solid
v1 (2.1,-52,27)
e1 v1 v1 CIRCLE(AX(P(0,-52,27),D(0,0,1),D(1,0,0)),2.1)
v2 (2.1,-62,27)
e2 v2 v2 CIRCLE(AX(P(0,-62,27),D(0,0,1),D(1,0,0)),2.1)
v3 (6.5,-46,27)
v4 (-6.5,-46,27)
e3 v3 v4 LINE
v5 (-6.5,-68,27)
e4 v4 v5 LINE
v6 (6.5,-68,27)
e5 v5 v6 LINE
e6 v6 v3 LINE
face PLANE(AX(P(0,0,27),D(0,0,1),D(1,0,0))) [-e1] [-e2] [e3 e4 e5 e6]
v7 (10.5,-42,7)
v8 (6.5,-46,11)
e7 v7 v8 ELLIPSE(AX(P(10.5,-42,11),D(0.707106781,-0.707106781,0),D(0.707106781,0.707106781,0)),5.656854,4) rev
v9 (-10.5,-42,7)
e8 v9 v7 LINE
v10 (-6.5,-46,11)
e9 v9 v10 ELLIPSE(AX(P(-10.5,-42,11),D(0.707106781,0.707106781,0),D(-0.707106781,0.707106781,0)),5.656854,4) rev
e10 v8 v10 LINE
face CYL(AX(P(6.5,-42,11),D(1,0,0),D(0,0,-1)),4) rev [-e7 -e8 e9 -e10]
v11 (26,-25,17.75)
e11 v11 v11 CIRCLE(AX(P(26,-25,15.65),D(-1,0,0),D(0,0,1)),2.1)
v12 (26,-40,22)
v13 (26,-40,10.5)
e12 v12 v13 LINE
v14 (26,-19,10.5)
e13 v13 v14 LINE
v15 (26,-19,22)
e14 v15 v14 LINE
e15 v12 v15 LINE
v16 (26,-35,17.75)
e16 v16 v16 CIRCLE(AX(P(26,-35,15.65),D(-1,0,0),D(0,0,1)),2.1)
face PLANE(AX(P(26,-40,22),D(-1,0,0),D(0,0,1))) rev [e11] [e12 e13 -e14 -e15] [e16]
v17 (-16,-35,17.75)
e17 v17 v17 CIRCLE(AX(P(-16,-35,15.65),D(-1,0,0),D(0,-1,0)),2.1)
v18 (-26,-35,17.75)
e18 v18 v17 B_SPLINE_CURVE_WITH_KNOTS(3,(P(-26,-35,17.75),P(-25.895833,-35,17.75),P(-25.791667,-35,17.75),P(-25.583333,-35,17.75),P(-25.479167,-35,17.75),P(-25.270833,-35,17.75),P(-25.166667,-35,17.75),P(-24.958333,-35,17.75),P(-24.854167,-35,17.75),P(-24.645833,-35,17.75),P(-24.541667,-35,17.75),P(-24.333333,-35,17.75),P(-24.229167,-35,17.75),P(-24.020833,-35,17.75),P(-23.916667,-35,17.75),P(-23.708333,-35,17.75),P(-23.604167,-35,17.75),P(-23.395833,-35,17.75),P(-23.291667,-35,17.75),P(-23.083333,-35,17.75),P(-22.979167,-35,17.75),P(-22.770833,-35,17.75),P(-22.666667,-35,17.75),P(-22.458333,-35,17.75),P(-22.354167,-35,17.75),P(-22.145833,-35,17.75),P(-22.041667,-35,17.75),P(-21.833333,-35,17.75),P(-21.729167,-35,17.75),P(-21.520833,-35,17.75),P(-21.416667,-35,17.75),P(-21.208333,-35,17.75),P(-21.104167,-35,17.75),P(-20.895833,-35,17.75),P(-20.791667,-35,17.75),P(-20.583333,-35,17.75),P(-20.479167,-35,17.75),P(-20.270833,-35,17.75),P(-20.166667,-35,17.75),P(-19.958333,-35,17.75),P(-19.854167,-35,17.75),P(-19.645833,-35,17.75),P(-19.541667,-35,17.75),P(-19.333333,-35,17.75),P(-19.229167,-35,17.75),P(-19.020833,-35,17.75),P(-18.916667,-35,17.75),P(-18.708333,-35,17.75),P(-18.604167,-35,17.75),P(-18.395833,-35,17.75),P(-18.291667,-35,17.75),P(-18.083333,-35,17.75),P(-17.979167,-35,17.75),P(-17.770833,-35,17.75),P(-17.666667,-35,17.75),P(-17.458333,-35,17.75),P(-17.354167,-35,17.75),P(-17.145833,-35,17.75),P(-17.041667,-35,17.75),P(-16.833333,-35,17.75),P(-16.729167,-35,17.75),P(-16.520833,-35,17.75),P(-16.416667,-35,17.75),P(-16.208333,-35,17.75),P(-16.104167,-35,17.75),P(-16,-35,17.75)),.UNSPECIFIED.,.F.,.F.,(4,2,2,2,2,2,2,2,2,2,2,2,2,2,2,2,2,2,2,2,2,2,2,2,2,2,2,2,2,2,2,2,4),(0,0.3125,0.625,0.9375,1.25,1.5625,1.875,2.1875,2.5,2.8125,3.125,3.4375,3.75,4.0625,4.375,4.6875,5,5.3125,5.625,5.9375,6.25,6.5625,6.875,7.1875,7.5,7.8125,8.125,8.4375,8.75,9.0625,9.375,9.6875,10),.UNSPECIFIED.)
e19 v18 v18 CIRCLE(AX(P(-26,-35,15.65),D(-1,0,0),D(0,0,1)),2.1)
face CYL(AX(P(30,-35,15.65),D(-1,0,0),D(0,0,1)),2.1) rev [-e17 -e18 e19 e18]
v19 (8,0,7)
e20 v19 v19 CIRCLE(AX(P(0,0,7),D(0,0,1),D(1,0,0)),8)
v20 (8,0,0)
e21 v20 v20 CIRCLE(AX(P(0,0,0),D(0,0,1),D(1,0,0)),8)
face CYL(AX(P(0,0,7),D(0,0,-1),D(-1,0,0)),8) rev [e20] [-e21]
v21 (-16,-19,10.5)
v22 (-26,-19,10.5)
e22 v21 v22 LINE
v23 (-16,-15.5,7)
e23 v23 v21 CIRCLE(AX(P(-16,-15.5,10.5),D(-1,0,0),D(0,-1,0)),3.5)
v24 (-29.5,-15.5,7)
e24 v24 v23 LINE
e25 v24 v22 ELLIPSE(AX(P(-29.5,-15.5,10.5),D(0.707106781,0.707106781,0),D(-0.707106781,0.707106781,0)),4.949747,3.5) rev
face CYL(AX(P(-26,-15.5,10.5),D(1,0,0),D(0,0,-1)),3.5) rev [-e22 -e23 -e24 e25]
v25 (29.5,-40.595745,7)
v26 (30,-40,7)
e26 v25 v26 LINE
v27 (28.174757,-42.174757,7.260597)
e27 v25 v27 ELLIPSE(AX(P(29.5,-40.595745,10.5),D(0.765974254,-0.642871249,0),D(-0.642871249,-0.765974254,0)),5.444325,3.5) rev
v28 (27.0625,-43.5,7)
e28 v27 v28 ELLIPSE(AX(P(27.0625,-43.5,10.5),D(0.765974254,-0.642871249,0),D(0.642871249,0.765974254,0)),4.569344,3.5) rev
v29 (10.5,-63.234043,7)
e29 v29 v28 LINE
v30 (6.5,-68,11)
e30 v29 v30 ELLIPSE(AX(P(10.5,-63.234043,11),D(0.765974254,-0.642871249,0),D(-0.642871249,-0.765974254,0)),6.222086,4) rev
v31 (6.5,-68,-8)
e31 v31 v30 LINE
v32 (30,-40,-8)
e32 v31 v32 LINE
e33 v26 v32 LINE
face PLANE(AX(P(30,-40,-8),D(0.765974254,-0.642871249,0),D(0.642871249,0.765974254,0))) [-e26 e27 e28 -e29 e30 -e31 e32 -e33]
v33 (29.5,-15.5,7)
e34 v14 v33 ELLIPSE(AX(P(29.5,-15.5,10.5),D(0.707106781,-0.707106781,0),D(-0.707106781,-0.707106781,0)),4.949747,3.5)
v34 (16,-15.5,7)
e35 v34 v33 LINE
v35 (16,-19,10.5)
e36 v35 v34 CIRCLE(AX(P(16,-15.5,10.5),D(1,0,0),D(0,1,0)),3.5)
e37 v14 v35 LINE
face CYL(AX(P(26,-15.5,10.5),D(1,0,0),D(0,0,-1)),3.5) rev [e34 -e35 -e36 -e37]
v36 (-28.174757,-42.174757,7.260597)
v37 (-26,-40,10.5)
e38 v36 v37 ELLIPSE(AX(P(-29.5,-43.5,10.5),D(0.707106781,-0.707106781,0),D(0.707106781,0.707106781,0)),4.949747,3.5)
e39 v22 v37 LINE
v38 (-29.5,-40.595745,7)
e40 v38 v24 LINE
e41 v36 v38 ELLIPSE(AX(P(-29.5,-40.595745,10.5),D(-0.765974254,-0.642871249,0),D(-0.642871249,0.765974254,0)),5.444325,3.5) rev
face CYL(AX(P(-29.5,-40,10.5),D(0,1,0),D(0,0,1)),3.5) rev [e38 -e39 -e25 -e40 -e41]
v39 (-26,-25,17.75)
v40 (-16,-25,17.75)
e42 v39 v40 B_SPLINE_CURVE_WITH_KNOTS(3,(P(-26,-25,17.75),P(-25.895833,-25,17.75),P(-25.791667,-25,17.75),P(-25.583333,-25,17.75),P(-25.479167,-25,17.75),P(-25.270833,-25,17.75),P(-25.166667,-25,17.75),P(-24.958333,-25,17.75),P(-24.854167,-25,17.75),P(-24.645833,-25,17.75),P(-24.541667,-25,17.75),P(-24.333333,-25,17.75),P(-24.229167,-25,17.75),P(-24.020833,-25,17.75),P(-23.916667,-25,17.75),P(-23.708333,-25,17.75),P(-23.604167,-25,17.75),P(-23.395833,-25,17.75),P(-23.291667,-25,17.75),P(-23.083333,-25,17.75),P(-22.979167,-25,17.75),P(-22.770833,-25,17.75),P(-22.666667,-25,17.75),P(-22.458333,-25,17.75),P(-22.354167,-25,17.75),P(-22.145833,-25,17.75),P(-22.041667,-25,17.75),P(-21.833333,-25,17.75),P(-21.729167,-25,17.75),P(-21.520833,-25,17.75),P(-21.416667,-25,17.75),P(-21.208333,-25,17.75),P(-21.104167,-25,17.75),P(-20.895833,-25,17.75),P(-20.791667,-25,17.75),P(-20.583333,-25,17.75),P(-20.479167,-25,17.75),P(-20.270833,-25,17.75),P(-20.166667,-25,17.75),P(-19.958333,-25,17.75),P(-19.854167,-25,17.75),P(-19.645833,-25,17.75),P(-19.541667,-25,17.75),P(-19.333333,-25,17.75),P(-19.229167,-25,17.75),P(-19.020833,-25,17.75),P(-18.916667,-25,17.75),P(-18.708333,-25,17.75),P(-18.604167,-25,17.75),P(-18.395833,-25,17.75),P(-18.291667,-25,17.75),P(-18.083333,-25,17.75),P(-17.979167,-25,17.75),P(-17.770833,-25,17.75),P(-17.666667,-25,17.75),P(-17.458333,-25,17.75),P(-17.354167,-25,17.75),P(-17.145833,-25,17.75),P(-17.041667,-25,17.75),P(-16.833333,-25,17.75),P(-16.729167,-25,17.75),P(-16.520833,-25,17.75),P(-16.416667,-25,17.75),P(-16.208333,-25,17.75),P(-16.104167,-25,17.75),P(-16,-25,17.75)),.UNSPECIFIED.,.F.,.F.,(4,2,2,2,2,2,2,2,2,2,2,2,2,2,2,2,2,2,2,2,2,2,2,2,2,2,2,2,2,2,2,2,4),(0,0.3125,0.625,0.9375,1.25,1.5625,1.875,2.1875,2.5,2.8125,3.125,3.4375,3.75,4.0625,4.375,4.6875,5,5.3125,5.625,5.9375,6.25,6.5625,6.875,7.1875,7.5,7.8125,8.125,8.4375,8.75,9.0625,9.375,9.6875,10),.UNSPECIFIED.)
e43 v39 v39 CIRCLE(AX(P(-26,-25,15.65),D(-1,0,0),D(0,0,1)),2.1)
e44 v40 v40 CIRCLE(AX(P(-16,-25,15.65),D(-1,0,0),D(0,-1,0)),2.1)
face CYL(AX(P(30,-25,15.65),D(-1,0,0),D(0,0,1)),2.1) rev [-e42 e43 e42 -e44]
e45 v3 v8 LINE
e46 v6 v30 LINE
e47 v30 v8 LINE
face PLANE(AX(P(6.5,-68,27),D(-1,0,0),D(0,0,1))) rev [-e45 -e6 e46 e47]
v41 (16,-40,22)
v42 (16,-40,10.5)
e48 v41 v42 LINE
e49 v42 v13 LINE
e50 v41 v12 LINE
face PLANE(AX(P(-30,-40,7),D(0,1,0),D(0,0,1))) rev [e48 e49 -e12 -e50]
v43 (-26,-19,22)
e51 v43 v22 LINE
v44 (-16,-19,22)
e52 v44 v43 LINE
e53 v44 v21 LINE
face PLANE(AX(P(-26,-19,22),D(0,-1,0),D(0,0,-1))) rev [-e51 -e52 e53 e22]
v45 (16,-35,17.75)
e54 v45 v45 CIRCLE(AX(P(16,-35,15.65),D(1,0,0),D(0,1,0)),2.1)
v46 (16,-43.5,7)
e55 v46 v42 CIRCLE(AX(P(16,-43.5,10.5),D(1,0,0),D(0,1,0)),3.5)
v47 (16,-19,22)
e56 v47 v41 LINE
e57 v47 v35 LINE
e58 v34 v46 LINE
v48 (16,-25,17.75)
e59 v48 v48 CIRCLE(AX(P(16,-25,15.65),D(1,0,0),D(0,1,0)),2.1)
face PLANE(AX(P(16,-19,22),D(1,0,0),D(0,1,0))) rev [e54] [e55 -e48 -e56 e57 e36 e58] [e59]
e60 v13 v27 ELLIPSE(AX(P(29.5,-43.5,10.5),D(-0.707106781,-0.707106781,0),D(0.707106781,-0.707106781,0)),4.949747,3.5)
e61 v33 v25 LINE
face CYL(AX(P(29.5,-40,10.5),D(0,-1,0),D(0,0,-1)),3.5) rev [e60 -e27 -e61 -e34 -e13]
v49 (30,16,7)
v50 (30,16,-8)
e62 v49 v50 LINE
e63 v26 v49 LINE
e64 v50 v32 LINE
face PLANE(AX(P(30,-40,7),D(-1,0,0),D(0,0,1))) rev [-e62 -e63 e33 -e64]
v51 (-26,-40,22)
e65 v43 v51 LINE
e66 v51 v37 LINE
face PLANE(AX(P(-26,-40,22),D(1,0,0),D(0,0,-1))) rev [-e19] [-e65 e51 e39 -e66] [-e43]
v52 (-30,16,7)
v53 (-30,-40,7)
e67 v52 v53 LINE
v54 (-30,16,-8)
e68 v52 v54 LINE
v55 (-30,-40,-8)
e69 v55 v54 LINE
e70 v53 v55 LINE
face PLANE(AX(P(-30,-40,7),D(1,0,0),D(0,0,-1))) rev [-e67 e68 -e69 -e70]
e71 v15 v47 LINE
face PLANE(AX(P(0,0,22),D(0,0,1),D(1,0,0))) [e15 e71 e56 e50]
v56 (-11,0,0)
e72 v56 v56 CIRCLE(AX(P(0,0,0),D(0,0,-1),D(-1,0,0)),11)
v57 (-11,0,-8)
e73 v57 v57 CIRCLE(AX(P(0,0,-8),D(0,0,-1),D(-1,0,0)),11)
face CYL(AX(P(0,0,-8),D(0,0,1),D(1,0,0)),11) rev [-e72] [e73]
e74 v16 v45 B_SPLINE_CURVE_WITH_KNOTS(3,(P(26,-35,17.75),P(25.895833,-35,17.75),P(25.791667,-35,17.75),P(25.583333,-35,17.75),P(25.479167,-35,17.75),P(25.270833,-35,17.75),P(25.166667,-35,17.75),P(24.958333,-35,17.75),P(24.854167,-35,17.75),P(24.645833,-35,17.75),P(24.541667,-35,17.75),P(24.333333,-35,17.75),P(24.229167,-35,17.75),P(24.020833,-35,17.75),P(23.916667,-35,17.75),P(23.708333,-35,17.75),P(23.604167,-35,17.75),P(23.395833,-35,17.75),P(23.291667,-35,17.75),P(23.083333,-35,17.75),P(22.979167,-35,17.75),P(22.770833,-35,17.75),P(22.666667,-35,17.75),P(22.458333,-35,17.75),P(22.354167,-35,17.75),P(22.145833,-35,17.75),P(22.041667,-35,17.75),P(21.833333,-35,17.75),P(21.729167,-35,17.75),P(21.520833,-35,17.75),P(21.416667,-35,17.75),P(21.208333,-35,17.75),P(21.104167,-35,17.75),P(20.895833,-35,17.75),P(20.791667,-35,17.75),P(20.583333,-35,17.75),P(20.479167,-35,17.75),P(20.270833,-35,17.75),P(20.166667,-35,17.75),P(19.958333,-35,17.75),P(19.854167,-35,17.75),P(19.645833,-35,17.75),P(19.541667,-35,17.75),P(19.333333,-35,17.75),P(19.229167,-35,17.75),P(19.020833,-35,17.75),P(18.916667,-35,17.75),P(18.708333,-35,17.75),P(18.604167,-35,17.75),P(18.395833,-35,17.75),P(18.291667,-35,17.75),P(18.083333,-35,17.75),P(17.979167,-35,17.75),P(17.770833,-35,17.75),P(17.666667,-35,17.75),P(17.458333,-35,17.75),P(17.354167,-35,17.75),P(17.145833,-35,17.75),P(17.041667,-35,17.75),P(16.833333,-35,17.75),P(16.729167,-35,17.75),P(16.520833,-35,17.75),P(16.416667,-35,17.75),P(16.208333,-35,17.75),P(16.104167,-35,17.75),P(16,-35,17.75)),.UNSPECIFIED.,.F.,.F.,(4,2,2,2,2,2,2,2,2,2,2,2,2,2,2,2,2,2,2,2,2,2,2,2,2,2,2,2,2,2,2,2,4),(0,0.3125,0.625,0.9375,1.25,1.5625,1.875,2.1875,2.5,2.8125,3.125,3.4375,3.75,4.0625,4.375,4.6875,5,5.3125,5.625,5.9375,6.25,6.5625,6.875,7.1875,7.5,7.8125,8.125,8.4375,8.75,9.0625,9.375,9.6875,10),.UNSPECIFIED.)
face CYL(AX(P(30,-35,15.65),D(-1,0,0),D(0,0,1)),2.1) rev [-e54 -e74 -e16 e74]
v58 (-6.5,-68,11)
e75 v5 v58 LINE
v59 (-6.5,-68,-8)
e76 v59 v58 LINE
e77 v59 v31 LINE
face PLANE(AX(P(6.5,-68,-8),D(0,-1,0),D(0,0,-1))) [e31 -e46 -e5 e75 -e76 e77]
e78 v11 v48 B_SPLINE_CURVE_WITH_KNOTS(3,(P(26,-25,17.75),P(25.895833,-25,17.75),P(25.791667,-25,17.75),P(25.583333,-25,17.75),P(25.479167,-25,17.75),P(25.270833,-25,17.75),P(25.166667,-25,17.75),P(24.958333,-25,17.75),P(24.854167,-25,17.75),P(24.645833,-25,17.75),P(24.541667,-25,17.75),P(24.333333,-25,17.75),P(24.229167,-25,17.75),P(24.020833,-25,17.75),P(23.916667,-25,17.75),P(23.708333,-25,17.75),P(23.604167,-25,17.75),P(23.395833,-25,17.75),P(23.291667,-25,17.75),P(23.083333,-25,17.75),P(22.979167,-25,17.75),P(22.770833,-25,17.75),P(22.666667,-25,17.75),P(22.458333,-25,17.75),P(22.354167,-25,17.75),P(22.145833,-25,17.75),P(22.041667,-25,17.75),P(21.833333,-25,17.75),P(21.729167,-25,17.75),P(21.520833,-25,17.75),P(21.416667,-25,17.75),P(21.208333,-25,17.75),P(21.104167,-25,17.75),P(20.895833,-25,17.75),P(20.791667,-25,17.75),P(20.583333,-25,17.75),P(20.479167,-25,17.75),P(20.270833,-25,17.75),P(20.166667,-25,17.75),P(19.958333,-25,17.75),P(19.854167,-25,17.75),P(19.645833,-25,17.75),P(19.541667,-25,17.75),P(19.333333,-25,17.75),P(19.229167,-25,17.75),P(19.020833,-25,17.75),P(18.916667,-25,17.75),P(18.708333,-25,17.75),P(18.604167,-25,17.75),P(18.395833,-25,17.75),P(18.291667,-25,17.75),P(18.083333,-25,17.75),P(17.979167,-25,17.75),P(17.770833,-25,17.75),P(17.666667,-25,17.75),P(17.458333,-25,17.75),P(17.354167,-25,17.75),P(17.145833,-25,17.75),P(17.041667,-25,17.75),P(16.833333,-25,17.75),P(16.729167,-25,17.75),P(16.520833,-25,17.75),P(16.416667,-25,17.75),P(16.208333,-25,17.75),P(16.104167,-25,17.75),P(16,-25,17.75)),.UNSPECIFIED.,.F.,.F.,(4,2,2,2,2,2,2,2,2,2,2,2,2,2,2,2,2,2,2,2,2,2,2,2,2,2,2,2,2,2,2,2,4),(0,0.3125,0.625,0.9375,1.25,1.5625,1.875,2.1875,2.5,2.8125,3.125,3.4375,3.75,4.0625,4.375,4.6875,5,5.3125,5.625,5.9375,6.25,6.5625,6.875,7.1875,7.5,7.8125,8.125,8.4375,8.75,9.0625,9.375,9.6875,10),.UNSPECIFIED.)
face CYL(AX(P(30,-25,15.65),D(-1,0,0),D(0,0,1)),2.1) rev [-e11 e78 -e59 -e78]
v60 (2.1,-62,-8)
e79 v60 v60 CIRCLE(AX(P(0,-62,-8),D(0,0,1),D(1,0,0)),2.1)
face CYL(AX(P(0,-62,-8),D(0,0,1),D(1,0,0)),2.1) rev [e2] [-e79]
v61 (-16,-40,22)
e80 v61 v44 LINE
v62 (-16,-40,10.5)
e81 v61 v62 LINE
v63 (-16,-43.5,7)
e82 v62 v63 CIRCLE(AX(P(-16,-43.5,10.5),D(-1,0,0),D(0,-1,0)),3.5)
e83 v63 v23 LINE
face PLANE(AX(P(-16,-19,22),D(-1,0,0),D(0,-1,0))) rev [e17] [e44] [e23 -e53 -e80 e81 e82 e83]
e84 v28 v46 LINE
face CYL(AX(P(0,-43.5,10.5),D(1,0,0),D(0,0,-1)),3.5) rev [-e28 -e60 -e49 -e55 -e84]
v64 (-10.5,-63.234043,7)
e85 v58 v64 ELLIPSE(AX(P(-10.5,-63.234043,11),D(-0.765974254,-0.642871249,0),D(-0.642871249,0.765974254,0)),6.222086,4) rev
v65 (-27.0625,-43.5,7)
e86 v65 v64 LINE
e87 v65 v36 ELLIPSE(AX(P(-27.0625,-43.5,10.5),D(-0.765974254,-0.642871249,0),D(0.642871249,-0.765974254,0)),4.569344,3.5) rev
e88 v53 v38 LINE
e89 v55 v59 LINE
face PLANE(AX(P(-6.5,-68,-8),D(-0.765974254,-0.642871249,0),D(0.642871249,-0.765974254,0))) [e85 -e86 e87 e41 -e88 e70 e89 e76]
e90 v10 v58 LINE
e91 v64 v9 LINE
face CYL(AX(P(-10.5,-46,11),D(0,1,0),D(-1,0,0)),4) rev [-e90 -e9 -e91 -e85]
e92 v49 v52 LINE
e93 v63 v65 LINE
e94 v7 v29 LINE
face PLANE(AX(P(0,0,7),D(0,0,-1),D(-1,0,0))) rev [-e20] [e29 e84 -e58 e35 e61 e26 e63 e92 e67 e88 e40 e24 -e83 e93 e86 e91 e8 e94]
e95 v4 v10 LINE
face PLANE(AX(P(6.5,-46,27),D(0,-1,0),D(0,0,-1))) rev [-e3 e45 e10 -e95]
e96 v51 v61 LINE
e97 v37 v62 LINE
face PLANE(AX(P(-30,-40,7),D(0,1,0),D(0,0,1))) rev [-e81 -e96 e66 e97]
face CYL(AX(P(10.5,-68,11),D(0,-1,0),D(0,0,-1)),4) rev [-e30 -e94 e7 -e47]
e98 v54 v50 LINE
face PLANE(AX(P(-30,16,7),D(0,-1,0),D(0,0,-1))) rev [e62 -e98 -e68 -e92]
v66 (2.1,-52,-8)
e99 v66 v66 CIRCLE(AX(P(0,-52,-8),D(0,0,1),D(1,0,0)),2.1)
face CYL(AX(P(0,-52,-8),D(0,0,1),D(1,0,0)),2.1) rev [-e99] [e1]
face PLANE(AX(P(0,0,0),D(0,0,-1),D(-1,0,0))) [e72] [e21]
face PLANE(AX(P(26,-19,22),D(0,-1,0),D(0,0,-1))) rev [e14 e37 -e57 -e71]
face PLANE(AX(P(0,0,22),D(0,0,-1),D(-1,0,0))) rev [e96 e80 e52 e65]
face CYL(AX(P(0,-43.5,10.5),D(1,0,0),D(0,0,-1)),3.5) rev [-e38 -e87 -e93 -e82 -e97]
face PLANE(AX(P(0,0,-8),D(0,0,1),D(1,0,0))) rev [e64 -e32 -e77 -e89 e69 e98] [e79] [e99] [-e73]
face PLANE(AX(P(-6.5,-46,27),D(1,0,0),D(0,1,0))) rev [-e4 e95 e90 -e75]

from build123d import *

# Parameters (mm, degrees)
SKETCH1_W           = 60
SKETCH1_H           = 56
SKETCH1_R           = 8
BOSS_EXTRUDE1_DEPTH = 7
SKETCH2_W           = 60
SKETCH2_H           = 56
SKETCH2_R           = 11
BOSS_EXTRUDE2_DEPTH = 8
SKETCH3_W           = 10
SKETCH3_H           = 21
BOSS_EXTRUDE3_DEPTH = 15
SKETCH4_R           = 2.1
CUT_EXTRUDE1_DEPTH  = 73.249567473
SKETCH5_R           = 2.1
BOSS_EXTRUDE4_DEPTH = 15
FILLET2_R           = 3.5
BOSS_EXTRUDE5_START = 20
SKETCH7_W           = 13
SKETCH7_H           = 22
SKETCH7_R           = 2.1
BOSS_EXTRUDE5_DEPTH = 20
FILLET3_R           = 4


with BuildPart() as part:
    # Sketch1 → Boss-Extrude1 (new body)
    with BuildSketch(Plane.XY):
        with Locations((0, -12)):
            Rectangle(SKETCH1_W, SKETCH1_H)
        Circle(SKETCH1_R, mode=Mode.SUBTRACT)
    extrude(amount=BOSS_EXTRUDE1_DEPTH)

    # Sketch2 → Boss-Extrude2 (add)
    with BuildSketch(Plane(origin=(0, 0, 0), x_dir=(-1, 0, 0), z_dir=(0, 0, -1))):
        with Locations((0, -12)):
            Rectangle(SKETCH2_W, SKETCH2_H)
        Circle(SKETCH2_R, mode=Mode.SUBTRACT)
    extrude(amount=BOSS_EXTRUDE2_DEPTH)

    # Sketch3 → Boss-Extrude3 (add)
    with BuildSketch(Plane.XY.offset(7)):
        with Locations((-21, -29.5)):
            Rectangle(SKETCH3_W, SKETCH3_H)
        with Locations((21, -29.5)):
            Rectangle(SKETCH3_W, SKETCH3_H)
    extrude(amount=BOSS_EXTRUDE3_DEPTH)

    # Sketch4 → Cut-Extrude1 (cut, through all)
    with BuildSketch(Plane.ZY.offset(26)):
        with Locations((15.65, -25)):
            Circle(SKETCH4_R)
        with Locations((15.65, -35)):
            Circle(SKETCH4_R)
    extrude(amount=-CUT_EXTRUDE1_DEPTH, mode=Mode.SUBTRACT)

    # Sketch5 → Boss-Extrude4 (add, through all)
    with BuildSketch(Plane.XY.offset(7)):
        Polygon((-30, -40), (30, -40), (6.5, -68), (-6.5, -68), align=None)
        with Locations((0, -52)):
            Circle(SKETCH5_R, mode=Mode.SUBTRACT)
        with Locations((0, -62)):
            Circle(SKETCH5_R, mode=Mode.SUBTRACT)
    extrude(amount=-BOSS_EXTRUDE4_DEPTH)

    # Fillet2
    # the kernel refuses this fillet: 3.5 mm, written as the material it adds along each edge
    with BuildSketch(Plane(origin=(-26, -19, 7), x_dir=(0, 1, 0), z_dir=(1, 0, 0)), Plane(origin=(-26, -40, 7), x_dir=(0, 0, 1), z_dir=(1, 0, 0))) as fillet2_piece_1:
        with BuildLine():
            CenterArc((FILLET2_R, FILLET2_R), FILLET2_R, 180, 90)
            Line((0, FILLET2_R), (0, 0))
            Line((0, 0), (FILLET2_R, 0))
        make_face()
    extrude(amount=10)
    with BuildSketch(Plane(origin=(-26, -40, 7), x_dir=(-1, 0, 0), z_dir=(0, 1, 0))) as fillet2_piece_2:
        with BuildLine():
            CenterArc((FILLET2_R, FILLET2_R), FILLET2_R, 180, 90)
            Line((0, FILLET2_R), (0, 0))
            Line((0, 0), (FILLET2_R, 0))
        make_face()
    extrude(amount=21)
    with BuildSketch(Plane(origin=(26, -19, 7), x_dir=(0, 1, 0), z_dir=(-1, 0, 0)), Plane(origin=(16, -40, 7), x_dir=(0, -1, 0), z_dir=(1, 0, 0))) as fillet2_piece_3:
        with BuildLine():
            CenterArc((FILLET2_R, -FILLET2_R), FILLET2_R, 90, 90)
            Line((0, -FILLET2_R), (0, 0))
            Line((0, 0), (FILLET2_R, 0))
        make_face()
    extrude(amount=10)
    with BuildSketch(Plane(origin=(26, -40, 7), x_dir=(1, 0, 0), z_dir=(0, 1, 0))) as fillet2_piece_4:
        with BuildLine():
            CenterArc((FILLET2_R, -FILLET2_R), FILLET2_R, 90, 90)
            Line((0, -FILLET2_R), (0, 0))
            Line((0, 0), (FILLET2_R, 0))
        make_face()
    extrude(amount=21)
    with BuildSketch(Plane(origin=(-34.75, -19, 7), x_dir=(0, 1, 0), z_dir=(1, 0, 0))) as fillet2_piece_5a_section:
        with BuildLine():
            CenterArc((FILLET2_R, FILLET2_R), FILLET2_R, 180, 90)
            Line((0, FILLET2_R), (0, 0))
            Line((0, 0), (FILLET2_R, 0))
        make_face()
    fillet2_piece_5a = extrude(amount=18.75, mode=Mode.PRIVATE)
    fillet2_piece_5a = split(fillet2_piece_5a, bisect_by=Plane(origin=(-30, -18.2076171, 7.7923829), z_dir=(1, 0, 0)), keep=Keep.TOP, mode=Mode.PRIVATE)
    fillet2_piece_5a = split(fillet2_piece_5a, bisect_by=Plane(origin=(-26, -18.2076171, 7.7923829), z_dir=(-1, 0, 0)), keep=Keep.TOP, mode=Mode.PRIVATE)
    with BuildSketch(Plane(origin=(-26, -40, 7), x_dir=(-1, 0, 0), z_dir=(0, 1, 0))) as fillet2_piece_5b_section:
        with BuildLine():
            CenterArc((FILLET2_R, FILLET2_R), FILLET2_R, 180, 90)
            Line((0, FILLET2_R), (0, 0))
            Line((0, 0), (FILLET2_R, 0))
        make_face()
    fillet2_piece_5b = extrude(amount=29.75, mode=Mode.PRIVATE)
    fillet2_piece_5b = split(fillet2_piece_5b, bisect_by=Plane(origin=(-26.7923829, -19, 7.7923829), z_dir=(0, 1, 0)), keep=Keep.TOP, mode=Mode.PRIVATE)
    fillet2_piece_5 = fillet2_piece_5a & fillet2_piece_5b
    add(fillet2_piece_5)
    with BuildSketch(Plane(origin=(-34.75, -40, 7), x_dir=(0, 0, 1), z_dir=(1, 0, 0))) as fillet2_piece_6a_section:
        with BuildLine():
            CenterArc((FILLET2_R, FILLET2_R), FILLET2_R, 180, 90)
            Line((0, FILLET2_R), (0, 0))
            Line((0, 0), (FILLET2_R, 0))
        make_face()
    fillet2_piece_6a = extrude(amount=18.75, mode=Mode.PRIVATE)
    fillet2_piece_6a = split(fillet2_piece_6a, bisect_by=Plane(origin=(-26, -40.649592252, 7.87643738), z_dir=(-1, 0, 0)), keep=Keep.TOP, mode=Mode.PRIVATE)
    fillet2_piece_6a = split(fillet2_piece_6a, bisect_by=Plane(origin=(-28.740316489, -41.500899502, 7.87643738), z_dir=(0.765974253829985, 0.6428712487501661, 0)), keep=Keep.TOP, mode=Mode.PRIVATE)
    fillet2_piece_6a = split(fillet2_piece_6a, bisect_by=Plane(origin=(-30, -40.649592252, 7.87643738), z_dir=(1, 0, 0)), keep=Keep.TOP, mode=Mode.PRIVATE)
    with BuildSketch(Plane(origin=(-26, -48.75, 7), x_dir=(-1, 0, 0), z_dir=(0, 1, 0))) as fillet2_piece_6b_section:
        with BuildLine():
            CenterArc((FILLET2_R, FILLET2_R), FILLET2_R, 180, 90)
            Line((0, FILLET2_R), (0, 0))
            Line((0, 0), (FILLET2_R, 0))
        make_face()
    fillet2_piece_6b = extrude(amount=29.75, mode=Mode.PRIVATE)
    fillet2_piece_6b = split(fillet2_piece_6b, bisect_by=Plane(origin=(-26.614887028, -40, 7.897241021), z_dir=(0, -1, 0)), keep=Keep.TOP, mode=Mode.PRIVATE)
    fillet2_piece_6b = split(fillet2_piece_6b, bisect_by=Plane(origin=(-27.607937943, -42.850116494, 7.897241021), z_dir=(0.765974253829985, 0.6428712487501661, 0)), keep=Keep.TOP, mode=Mode.PRIVATE)
    fillet2_piece_6 = fillet2_piece_6a & fillet2_piece_6b
    add(fillet2_piece_6)
    with BuildSketch(Plane(origin=(26, -40, 7), x_dir=(1, 0, 0), z_dir=(0, 1, 0))) as fillet2_piece_7a_section:
        with BuildLine():
            CenterArc((FILLET2_R, -FILLET2_R), FILLET2_R, 90, 90)
            Line((0, -FILLET2_R), (0, 0))
            Line((0, 0), (FILLET2_R, 0))
        make_face()
    fillet2_piece_7a = extrude(amount=29.75, mode=Mode.PRIVATE)
    fillet2_piece_7a = split(fillet2_piece_7a, bisect_by=Plane(origin=(26.7923829, -19, 7.7923829), z_dir=(0, 1, 0)), keep=Keep.TOP, mode=Mode.PRIVATE)
    with BuildSketch(Plane(origin=(34.75, -19, 7), x_dir=(0, 1, 0), z_dir=(-1, 0, 0))) as fillet2_piece_7b_section:
        with BuildLine():
            CenterArc((FILLET2_R, -FILLET2_R), FILLET2_R, 90, 90)
            Line((0, -FILLET2_R), (0, 0))
            Line((0, 0), (FILLET2_R, 0))
        make_face()
    fillet2_piece_7b = extrude(amount=18.75, mode=Mode.PRIVATE)
    fillet2_piece_7b = split(fillet2_piece_7b, bisect_by=Plane(origin=(30, -18.2076171, 7.7923829), z_dir=(-1, 0, 0)), keep=Keep.TOP, mode=Mode.PRIVATE)
    fillet2_piece_7b = split(fillet2_piece_7b, bisect_by=Plane(origin=(26, -18.2076171, 7.7923829), z_dir=(1, 0, 0)), keep=Keep.TOP, mode=Mode.PRIVATE)
    fillet2_piece_7 = fillet2_piece_7a & fillet2_piece_7b
    add(fillet2_piece_7)
    with BuildSketch(Plane(origin=(16, -40, 7), x_dir=(0, -1, 0), z_dir=(1, 0, 0))) as fillet2_piece_8a_section:
        with BuildLine():
            CenterArc((FILLET2_R, -FILLET2_R), FILLET2_R, 90, 90)
            Line((0, -FILLET2_R), (0, 0))
            Line((0, 0), (FILLET2_R, 0))
        make_face()
    fillet2_piece_8a = extrude(amount=18.75, mode=Mode.PRIVATE)
    fillet2_piece_8a = split(fillet2_piece_8a, bisect_by=Plane(origin=(28.740316489, -41.500899502, 7.87643738), z_dir=(-0.7659742538299851, 0.6428712487501659, 0)), keep=Keep.TOP, mode=Mode.PRIVATE)
    fillet2_piece_8a = split(fillet2_piece_8a, bisect_by=Plane(origin=(30, -40.649592252, 7.87643738), z_dir=(-1, 0, 0)), keep=Keep.TOP, mode=Mode.PRIVATE)
    fillet2_piece_8a = split(fillet2_piece_8a, bisect_by=Plane(origin=(26, -40.649592252, 7.87643738), z_dir=(1, 0, 0)), keep=Keep.TOP, mode=Mode.PRIVATE)
    with BuildSketch(Plane(origin=(26, -48.75, 7), x_dir=(1, 0, 0), z_dir=(0, 1, 0))) as fillet2_piece_8b_section:
        with BuildLine():
            CenterArc((FILLET2_R, -FILLET2_R), FILLET2_R, 90, 90)
            Line((0, -FILLET2_R), (0, 0))
            Line((0, 0), (FILLET2_R, 0))
        make_face()
    fillet2_piece_8b = extrude(amount=29.75, mode=Mode.PRIVATE)
    fillet2_piece_8b = split(fillet2_piece_8b, bisect_by=Plane(origin=(27.607937943, -42.850116494, 7.897241021), z_dir=(-0.7659742538299851, 0.6428712487501659, 0)), keep=Keep.TOP, mode=Mode.PRIVATE)
    fillet2_piece_8b = split(fillet2_piece_8b, bisect_by=Plane(origin=(26.614887028, -40, 7.897241021), z_dir=(0, -1, 0)), keep=Keep.TOP, mode=Mode.PRIVATE)
    fillet2_piece_8 = fillet2_piece_8a & fillet2_piece_8b
    add(fillet2_piece_8)

    # Sketch7 → Boss-Extrude5 (add)
    with BuildSketch(Plane.XY.offset(7).offset(BOSS_EXTRUDE5_START)):
        with Locations((0, -57)):
            Rectangle(SKETCH7_W, SKETCH7_H)
        with Locations((0, -62)):
            Circle(SKETCH7_R, mode=Mode.SUBTRACT)
        with Locations((0, -52)):
            Circle(SKETCH7_R, mode=Mode.SUBTRACT)
    extrude(amount=-BOSS_EXTRUDE5_DEPTH)

    # Fillet3
    fillet3_edges = [part.edges().sort_by_distance(p)[0] for p in [
        (-6.5, -57, 7),
        (6.5, -57, 7),
        (0, -46, 7),
    ]]
    fillet(fillet3_edges, radius=FILLET3_R)


solid = part.part
